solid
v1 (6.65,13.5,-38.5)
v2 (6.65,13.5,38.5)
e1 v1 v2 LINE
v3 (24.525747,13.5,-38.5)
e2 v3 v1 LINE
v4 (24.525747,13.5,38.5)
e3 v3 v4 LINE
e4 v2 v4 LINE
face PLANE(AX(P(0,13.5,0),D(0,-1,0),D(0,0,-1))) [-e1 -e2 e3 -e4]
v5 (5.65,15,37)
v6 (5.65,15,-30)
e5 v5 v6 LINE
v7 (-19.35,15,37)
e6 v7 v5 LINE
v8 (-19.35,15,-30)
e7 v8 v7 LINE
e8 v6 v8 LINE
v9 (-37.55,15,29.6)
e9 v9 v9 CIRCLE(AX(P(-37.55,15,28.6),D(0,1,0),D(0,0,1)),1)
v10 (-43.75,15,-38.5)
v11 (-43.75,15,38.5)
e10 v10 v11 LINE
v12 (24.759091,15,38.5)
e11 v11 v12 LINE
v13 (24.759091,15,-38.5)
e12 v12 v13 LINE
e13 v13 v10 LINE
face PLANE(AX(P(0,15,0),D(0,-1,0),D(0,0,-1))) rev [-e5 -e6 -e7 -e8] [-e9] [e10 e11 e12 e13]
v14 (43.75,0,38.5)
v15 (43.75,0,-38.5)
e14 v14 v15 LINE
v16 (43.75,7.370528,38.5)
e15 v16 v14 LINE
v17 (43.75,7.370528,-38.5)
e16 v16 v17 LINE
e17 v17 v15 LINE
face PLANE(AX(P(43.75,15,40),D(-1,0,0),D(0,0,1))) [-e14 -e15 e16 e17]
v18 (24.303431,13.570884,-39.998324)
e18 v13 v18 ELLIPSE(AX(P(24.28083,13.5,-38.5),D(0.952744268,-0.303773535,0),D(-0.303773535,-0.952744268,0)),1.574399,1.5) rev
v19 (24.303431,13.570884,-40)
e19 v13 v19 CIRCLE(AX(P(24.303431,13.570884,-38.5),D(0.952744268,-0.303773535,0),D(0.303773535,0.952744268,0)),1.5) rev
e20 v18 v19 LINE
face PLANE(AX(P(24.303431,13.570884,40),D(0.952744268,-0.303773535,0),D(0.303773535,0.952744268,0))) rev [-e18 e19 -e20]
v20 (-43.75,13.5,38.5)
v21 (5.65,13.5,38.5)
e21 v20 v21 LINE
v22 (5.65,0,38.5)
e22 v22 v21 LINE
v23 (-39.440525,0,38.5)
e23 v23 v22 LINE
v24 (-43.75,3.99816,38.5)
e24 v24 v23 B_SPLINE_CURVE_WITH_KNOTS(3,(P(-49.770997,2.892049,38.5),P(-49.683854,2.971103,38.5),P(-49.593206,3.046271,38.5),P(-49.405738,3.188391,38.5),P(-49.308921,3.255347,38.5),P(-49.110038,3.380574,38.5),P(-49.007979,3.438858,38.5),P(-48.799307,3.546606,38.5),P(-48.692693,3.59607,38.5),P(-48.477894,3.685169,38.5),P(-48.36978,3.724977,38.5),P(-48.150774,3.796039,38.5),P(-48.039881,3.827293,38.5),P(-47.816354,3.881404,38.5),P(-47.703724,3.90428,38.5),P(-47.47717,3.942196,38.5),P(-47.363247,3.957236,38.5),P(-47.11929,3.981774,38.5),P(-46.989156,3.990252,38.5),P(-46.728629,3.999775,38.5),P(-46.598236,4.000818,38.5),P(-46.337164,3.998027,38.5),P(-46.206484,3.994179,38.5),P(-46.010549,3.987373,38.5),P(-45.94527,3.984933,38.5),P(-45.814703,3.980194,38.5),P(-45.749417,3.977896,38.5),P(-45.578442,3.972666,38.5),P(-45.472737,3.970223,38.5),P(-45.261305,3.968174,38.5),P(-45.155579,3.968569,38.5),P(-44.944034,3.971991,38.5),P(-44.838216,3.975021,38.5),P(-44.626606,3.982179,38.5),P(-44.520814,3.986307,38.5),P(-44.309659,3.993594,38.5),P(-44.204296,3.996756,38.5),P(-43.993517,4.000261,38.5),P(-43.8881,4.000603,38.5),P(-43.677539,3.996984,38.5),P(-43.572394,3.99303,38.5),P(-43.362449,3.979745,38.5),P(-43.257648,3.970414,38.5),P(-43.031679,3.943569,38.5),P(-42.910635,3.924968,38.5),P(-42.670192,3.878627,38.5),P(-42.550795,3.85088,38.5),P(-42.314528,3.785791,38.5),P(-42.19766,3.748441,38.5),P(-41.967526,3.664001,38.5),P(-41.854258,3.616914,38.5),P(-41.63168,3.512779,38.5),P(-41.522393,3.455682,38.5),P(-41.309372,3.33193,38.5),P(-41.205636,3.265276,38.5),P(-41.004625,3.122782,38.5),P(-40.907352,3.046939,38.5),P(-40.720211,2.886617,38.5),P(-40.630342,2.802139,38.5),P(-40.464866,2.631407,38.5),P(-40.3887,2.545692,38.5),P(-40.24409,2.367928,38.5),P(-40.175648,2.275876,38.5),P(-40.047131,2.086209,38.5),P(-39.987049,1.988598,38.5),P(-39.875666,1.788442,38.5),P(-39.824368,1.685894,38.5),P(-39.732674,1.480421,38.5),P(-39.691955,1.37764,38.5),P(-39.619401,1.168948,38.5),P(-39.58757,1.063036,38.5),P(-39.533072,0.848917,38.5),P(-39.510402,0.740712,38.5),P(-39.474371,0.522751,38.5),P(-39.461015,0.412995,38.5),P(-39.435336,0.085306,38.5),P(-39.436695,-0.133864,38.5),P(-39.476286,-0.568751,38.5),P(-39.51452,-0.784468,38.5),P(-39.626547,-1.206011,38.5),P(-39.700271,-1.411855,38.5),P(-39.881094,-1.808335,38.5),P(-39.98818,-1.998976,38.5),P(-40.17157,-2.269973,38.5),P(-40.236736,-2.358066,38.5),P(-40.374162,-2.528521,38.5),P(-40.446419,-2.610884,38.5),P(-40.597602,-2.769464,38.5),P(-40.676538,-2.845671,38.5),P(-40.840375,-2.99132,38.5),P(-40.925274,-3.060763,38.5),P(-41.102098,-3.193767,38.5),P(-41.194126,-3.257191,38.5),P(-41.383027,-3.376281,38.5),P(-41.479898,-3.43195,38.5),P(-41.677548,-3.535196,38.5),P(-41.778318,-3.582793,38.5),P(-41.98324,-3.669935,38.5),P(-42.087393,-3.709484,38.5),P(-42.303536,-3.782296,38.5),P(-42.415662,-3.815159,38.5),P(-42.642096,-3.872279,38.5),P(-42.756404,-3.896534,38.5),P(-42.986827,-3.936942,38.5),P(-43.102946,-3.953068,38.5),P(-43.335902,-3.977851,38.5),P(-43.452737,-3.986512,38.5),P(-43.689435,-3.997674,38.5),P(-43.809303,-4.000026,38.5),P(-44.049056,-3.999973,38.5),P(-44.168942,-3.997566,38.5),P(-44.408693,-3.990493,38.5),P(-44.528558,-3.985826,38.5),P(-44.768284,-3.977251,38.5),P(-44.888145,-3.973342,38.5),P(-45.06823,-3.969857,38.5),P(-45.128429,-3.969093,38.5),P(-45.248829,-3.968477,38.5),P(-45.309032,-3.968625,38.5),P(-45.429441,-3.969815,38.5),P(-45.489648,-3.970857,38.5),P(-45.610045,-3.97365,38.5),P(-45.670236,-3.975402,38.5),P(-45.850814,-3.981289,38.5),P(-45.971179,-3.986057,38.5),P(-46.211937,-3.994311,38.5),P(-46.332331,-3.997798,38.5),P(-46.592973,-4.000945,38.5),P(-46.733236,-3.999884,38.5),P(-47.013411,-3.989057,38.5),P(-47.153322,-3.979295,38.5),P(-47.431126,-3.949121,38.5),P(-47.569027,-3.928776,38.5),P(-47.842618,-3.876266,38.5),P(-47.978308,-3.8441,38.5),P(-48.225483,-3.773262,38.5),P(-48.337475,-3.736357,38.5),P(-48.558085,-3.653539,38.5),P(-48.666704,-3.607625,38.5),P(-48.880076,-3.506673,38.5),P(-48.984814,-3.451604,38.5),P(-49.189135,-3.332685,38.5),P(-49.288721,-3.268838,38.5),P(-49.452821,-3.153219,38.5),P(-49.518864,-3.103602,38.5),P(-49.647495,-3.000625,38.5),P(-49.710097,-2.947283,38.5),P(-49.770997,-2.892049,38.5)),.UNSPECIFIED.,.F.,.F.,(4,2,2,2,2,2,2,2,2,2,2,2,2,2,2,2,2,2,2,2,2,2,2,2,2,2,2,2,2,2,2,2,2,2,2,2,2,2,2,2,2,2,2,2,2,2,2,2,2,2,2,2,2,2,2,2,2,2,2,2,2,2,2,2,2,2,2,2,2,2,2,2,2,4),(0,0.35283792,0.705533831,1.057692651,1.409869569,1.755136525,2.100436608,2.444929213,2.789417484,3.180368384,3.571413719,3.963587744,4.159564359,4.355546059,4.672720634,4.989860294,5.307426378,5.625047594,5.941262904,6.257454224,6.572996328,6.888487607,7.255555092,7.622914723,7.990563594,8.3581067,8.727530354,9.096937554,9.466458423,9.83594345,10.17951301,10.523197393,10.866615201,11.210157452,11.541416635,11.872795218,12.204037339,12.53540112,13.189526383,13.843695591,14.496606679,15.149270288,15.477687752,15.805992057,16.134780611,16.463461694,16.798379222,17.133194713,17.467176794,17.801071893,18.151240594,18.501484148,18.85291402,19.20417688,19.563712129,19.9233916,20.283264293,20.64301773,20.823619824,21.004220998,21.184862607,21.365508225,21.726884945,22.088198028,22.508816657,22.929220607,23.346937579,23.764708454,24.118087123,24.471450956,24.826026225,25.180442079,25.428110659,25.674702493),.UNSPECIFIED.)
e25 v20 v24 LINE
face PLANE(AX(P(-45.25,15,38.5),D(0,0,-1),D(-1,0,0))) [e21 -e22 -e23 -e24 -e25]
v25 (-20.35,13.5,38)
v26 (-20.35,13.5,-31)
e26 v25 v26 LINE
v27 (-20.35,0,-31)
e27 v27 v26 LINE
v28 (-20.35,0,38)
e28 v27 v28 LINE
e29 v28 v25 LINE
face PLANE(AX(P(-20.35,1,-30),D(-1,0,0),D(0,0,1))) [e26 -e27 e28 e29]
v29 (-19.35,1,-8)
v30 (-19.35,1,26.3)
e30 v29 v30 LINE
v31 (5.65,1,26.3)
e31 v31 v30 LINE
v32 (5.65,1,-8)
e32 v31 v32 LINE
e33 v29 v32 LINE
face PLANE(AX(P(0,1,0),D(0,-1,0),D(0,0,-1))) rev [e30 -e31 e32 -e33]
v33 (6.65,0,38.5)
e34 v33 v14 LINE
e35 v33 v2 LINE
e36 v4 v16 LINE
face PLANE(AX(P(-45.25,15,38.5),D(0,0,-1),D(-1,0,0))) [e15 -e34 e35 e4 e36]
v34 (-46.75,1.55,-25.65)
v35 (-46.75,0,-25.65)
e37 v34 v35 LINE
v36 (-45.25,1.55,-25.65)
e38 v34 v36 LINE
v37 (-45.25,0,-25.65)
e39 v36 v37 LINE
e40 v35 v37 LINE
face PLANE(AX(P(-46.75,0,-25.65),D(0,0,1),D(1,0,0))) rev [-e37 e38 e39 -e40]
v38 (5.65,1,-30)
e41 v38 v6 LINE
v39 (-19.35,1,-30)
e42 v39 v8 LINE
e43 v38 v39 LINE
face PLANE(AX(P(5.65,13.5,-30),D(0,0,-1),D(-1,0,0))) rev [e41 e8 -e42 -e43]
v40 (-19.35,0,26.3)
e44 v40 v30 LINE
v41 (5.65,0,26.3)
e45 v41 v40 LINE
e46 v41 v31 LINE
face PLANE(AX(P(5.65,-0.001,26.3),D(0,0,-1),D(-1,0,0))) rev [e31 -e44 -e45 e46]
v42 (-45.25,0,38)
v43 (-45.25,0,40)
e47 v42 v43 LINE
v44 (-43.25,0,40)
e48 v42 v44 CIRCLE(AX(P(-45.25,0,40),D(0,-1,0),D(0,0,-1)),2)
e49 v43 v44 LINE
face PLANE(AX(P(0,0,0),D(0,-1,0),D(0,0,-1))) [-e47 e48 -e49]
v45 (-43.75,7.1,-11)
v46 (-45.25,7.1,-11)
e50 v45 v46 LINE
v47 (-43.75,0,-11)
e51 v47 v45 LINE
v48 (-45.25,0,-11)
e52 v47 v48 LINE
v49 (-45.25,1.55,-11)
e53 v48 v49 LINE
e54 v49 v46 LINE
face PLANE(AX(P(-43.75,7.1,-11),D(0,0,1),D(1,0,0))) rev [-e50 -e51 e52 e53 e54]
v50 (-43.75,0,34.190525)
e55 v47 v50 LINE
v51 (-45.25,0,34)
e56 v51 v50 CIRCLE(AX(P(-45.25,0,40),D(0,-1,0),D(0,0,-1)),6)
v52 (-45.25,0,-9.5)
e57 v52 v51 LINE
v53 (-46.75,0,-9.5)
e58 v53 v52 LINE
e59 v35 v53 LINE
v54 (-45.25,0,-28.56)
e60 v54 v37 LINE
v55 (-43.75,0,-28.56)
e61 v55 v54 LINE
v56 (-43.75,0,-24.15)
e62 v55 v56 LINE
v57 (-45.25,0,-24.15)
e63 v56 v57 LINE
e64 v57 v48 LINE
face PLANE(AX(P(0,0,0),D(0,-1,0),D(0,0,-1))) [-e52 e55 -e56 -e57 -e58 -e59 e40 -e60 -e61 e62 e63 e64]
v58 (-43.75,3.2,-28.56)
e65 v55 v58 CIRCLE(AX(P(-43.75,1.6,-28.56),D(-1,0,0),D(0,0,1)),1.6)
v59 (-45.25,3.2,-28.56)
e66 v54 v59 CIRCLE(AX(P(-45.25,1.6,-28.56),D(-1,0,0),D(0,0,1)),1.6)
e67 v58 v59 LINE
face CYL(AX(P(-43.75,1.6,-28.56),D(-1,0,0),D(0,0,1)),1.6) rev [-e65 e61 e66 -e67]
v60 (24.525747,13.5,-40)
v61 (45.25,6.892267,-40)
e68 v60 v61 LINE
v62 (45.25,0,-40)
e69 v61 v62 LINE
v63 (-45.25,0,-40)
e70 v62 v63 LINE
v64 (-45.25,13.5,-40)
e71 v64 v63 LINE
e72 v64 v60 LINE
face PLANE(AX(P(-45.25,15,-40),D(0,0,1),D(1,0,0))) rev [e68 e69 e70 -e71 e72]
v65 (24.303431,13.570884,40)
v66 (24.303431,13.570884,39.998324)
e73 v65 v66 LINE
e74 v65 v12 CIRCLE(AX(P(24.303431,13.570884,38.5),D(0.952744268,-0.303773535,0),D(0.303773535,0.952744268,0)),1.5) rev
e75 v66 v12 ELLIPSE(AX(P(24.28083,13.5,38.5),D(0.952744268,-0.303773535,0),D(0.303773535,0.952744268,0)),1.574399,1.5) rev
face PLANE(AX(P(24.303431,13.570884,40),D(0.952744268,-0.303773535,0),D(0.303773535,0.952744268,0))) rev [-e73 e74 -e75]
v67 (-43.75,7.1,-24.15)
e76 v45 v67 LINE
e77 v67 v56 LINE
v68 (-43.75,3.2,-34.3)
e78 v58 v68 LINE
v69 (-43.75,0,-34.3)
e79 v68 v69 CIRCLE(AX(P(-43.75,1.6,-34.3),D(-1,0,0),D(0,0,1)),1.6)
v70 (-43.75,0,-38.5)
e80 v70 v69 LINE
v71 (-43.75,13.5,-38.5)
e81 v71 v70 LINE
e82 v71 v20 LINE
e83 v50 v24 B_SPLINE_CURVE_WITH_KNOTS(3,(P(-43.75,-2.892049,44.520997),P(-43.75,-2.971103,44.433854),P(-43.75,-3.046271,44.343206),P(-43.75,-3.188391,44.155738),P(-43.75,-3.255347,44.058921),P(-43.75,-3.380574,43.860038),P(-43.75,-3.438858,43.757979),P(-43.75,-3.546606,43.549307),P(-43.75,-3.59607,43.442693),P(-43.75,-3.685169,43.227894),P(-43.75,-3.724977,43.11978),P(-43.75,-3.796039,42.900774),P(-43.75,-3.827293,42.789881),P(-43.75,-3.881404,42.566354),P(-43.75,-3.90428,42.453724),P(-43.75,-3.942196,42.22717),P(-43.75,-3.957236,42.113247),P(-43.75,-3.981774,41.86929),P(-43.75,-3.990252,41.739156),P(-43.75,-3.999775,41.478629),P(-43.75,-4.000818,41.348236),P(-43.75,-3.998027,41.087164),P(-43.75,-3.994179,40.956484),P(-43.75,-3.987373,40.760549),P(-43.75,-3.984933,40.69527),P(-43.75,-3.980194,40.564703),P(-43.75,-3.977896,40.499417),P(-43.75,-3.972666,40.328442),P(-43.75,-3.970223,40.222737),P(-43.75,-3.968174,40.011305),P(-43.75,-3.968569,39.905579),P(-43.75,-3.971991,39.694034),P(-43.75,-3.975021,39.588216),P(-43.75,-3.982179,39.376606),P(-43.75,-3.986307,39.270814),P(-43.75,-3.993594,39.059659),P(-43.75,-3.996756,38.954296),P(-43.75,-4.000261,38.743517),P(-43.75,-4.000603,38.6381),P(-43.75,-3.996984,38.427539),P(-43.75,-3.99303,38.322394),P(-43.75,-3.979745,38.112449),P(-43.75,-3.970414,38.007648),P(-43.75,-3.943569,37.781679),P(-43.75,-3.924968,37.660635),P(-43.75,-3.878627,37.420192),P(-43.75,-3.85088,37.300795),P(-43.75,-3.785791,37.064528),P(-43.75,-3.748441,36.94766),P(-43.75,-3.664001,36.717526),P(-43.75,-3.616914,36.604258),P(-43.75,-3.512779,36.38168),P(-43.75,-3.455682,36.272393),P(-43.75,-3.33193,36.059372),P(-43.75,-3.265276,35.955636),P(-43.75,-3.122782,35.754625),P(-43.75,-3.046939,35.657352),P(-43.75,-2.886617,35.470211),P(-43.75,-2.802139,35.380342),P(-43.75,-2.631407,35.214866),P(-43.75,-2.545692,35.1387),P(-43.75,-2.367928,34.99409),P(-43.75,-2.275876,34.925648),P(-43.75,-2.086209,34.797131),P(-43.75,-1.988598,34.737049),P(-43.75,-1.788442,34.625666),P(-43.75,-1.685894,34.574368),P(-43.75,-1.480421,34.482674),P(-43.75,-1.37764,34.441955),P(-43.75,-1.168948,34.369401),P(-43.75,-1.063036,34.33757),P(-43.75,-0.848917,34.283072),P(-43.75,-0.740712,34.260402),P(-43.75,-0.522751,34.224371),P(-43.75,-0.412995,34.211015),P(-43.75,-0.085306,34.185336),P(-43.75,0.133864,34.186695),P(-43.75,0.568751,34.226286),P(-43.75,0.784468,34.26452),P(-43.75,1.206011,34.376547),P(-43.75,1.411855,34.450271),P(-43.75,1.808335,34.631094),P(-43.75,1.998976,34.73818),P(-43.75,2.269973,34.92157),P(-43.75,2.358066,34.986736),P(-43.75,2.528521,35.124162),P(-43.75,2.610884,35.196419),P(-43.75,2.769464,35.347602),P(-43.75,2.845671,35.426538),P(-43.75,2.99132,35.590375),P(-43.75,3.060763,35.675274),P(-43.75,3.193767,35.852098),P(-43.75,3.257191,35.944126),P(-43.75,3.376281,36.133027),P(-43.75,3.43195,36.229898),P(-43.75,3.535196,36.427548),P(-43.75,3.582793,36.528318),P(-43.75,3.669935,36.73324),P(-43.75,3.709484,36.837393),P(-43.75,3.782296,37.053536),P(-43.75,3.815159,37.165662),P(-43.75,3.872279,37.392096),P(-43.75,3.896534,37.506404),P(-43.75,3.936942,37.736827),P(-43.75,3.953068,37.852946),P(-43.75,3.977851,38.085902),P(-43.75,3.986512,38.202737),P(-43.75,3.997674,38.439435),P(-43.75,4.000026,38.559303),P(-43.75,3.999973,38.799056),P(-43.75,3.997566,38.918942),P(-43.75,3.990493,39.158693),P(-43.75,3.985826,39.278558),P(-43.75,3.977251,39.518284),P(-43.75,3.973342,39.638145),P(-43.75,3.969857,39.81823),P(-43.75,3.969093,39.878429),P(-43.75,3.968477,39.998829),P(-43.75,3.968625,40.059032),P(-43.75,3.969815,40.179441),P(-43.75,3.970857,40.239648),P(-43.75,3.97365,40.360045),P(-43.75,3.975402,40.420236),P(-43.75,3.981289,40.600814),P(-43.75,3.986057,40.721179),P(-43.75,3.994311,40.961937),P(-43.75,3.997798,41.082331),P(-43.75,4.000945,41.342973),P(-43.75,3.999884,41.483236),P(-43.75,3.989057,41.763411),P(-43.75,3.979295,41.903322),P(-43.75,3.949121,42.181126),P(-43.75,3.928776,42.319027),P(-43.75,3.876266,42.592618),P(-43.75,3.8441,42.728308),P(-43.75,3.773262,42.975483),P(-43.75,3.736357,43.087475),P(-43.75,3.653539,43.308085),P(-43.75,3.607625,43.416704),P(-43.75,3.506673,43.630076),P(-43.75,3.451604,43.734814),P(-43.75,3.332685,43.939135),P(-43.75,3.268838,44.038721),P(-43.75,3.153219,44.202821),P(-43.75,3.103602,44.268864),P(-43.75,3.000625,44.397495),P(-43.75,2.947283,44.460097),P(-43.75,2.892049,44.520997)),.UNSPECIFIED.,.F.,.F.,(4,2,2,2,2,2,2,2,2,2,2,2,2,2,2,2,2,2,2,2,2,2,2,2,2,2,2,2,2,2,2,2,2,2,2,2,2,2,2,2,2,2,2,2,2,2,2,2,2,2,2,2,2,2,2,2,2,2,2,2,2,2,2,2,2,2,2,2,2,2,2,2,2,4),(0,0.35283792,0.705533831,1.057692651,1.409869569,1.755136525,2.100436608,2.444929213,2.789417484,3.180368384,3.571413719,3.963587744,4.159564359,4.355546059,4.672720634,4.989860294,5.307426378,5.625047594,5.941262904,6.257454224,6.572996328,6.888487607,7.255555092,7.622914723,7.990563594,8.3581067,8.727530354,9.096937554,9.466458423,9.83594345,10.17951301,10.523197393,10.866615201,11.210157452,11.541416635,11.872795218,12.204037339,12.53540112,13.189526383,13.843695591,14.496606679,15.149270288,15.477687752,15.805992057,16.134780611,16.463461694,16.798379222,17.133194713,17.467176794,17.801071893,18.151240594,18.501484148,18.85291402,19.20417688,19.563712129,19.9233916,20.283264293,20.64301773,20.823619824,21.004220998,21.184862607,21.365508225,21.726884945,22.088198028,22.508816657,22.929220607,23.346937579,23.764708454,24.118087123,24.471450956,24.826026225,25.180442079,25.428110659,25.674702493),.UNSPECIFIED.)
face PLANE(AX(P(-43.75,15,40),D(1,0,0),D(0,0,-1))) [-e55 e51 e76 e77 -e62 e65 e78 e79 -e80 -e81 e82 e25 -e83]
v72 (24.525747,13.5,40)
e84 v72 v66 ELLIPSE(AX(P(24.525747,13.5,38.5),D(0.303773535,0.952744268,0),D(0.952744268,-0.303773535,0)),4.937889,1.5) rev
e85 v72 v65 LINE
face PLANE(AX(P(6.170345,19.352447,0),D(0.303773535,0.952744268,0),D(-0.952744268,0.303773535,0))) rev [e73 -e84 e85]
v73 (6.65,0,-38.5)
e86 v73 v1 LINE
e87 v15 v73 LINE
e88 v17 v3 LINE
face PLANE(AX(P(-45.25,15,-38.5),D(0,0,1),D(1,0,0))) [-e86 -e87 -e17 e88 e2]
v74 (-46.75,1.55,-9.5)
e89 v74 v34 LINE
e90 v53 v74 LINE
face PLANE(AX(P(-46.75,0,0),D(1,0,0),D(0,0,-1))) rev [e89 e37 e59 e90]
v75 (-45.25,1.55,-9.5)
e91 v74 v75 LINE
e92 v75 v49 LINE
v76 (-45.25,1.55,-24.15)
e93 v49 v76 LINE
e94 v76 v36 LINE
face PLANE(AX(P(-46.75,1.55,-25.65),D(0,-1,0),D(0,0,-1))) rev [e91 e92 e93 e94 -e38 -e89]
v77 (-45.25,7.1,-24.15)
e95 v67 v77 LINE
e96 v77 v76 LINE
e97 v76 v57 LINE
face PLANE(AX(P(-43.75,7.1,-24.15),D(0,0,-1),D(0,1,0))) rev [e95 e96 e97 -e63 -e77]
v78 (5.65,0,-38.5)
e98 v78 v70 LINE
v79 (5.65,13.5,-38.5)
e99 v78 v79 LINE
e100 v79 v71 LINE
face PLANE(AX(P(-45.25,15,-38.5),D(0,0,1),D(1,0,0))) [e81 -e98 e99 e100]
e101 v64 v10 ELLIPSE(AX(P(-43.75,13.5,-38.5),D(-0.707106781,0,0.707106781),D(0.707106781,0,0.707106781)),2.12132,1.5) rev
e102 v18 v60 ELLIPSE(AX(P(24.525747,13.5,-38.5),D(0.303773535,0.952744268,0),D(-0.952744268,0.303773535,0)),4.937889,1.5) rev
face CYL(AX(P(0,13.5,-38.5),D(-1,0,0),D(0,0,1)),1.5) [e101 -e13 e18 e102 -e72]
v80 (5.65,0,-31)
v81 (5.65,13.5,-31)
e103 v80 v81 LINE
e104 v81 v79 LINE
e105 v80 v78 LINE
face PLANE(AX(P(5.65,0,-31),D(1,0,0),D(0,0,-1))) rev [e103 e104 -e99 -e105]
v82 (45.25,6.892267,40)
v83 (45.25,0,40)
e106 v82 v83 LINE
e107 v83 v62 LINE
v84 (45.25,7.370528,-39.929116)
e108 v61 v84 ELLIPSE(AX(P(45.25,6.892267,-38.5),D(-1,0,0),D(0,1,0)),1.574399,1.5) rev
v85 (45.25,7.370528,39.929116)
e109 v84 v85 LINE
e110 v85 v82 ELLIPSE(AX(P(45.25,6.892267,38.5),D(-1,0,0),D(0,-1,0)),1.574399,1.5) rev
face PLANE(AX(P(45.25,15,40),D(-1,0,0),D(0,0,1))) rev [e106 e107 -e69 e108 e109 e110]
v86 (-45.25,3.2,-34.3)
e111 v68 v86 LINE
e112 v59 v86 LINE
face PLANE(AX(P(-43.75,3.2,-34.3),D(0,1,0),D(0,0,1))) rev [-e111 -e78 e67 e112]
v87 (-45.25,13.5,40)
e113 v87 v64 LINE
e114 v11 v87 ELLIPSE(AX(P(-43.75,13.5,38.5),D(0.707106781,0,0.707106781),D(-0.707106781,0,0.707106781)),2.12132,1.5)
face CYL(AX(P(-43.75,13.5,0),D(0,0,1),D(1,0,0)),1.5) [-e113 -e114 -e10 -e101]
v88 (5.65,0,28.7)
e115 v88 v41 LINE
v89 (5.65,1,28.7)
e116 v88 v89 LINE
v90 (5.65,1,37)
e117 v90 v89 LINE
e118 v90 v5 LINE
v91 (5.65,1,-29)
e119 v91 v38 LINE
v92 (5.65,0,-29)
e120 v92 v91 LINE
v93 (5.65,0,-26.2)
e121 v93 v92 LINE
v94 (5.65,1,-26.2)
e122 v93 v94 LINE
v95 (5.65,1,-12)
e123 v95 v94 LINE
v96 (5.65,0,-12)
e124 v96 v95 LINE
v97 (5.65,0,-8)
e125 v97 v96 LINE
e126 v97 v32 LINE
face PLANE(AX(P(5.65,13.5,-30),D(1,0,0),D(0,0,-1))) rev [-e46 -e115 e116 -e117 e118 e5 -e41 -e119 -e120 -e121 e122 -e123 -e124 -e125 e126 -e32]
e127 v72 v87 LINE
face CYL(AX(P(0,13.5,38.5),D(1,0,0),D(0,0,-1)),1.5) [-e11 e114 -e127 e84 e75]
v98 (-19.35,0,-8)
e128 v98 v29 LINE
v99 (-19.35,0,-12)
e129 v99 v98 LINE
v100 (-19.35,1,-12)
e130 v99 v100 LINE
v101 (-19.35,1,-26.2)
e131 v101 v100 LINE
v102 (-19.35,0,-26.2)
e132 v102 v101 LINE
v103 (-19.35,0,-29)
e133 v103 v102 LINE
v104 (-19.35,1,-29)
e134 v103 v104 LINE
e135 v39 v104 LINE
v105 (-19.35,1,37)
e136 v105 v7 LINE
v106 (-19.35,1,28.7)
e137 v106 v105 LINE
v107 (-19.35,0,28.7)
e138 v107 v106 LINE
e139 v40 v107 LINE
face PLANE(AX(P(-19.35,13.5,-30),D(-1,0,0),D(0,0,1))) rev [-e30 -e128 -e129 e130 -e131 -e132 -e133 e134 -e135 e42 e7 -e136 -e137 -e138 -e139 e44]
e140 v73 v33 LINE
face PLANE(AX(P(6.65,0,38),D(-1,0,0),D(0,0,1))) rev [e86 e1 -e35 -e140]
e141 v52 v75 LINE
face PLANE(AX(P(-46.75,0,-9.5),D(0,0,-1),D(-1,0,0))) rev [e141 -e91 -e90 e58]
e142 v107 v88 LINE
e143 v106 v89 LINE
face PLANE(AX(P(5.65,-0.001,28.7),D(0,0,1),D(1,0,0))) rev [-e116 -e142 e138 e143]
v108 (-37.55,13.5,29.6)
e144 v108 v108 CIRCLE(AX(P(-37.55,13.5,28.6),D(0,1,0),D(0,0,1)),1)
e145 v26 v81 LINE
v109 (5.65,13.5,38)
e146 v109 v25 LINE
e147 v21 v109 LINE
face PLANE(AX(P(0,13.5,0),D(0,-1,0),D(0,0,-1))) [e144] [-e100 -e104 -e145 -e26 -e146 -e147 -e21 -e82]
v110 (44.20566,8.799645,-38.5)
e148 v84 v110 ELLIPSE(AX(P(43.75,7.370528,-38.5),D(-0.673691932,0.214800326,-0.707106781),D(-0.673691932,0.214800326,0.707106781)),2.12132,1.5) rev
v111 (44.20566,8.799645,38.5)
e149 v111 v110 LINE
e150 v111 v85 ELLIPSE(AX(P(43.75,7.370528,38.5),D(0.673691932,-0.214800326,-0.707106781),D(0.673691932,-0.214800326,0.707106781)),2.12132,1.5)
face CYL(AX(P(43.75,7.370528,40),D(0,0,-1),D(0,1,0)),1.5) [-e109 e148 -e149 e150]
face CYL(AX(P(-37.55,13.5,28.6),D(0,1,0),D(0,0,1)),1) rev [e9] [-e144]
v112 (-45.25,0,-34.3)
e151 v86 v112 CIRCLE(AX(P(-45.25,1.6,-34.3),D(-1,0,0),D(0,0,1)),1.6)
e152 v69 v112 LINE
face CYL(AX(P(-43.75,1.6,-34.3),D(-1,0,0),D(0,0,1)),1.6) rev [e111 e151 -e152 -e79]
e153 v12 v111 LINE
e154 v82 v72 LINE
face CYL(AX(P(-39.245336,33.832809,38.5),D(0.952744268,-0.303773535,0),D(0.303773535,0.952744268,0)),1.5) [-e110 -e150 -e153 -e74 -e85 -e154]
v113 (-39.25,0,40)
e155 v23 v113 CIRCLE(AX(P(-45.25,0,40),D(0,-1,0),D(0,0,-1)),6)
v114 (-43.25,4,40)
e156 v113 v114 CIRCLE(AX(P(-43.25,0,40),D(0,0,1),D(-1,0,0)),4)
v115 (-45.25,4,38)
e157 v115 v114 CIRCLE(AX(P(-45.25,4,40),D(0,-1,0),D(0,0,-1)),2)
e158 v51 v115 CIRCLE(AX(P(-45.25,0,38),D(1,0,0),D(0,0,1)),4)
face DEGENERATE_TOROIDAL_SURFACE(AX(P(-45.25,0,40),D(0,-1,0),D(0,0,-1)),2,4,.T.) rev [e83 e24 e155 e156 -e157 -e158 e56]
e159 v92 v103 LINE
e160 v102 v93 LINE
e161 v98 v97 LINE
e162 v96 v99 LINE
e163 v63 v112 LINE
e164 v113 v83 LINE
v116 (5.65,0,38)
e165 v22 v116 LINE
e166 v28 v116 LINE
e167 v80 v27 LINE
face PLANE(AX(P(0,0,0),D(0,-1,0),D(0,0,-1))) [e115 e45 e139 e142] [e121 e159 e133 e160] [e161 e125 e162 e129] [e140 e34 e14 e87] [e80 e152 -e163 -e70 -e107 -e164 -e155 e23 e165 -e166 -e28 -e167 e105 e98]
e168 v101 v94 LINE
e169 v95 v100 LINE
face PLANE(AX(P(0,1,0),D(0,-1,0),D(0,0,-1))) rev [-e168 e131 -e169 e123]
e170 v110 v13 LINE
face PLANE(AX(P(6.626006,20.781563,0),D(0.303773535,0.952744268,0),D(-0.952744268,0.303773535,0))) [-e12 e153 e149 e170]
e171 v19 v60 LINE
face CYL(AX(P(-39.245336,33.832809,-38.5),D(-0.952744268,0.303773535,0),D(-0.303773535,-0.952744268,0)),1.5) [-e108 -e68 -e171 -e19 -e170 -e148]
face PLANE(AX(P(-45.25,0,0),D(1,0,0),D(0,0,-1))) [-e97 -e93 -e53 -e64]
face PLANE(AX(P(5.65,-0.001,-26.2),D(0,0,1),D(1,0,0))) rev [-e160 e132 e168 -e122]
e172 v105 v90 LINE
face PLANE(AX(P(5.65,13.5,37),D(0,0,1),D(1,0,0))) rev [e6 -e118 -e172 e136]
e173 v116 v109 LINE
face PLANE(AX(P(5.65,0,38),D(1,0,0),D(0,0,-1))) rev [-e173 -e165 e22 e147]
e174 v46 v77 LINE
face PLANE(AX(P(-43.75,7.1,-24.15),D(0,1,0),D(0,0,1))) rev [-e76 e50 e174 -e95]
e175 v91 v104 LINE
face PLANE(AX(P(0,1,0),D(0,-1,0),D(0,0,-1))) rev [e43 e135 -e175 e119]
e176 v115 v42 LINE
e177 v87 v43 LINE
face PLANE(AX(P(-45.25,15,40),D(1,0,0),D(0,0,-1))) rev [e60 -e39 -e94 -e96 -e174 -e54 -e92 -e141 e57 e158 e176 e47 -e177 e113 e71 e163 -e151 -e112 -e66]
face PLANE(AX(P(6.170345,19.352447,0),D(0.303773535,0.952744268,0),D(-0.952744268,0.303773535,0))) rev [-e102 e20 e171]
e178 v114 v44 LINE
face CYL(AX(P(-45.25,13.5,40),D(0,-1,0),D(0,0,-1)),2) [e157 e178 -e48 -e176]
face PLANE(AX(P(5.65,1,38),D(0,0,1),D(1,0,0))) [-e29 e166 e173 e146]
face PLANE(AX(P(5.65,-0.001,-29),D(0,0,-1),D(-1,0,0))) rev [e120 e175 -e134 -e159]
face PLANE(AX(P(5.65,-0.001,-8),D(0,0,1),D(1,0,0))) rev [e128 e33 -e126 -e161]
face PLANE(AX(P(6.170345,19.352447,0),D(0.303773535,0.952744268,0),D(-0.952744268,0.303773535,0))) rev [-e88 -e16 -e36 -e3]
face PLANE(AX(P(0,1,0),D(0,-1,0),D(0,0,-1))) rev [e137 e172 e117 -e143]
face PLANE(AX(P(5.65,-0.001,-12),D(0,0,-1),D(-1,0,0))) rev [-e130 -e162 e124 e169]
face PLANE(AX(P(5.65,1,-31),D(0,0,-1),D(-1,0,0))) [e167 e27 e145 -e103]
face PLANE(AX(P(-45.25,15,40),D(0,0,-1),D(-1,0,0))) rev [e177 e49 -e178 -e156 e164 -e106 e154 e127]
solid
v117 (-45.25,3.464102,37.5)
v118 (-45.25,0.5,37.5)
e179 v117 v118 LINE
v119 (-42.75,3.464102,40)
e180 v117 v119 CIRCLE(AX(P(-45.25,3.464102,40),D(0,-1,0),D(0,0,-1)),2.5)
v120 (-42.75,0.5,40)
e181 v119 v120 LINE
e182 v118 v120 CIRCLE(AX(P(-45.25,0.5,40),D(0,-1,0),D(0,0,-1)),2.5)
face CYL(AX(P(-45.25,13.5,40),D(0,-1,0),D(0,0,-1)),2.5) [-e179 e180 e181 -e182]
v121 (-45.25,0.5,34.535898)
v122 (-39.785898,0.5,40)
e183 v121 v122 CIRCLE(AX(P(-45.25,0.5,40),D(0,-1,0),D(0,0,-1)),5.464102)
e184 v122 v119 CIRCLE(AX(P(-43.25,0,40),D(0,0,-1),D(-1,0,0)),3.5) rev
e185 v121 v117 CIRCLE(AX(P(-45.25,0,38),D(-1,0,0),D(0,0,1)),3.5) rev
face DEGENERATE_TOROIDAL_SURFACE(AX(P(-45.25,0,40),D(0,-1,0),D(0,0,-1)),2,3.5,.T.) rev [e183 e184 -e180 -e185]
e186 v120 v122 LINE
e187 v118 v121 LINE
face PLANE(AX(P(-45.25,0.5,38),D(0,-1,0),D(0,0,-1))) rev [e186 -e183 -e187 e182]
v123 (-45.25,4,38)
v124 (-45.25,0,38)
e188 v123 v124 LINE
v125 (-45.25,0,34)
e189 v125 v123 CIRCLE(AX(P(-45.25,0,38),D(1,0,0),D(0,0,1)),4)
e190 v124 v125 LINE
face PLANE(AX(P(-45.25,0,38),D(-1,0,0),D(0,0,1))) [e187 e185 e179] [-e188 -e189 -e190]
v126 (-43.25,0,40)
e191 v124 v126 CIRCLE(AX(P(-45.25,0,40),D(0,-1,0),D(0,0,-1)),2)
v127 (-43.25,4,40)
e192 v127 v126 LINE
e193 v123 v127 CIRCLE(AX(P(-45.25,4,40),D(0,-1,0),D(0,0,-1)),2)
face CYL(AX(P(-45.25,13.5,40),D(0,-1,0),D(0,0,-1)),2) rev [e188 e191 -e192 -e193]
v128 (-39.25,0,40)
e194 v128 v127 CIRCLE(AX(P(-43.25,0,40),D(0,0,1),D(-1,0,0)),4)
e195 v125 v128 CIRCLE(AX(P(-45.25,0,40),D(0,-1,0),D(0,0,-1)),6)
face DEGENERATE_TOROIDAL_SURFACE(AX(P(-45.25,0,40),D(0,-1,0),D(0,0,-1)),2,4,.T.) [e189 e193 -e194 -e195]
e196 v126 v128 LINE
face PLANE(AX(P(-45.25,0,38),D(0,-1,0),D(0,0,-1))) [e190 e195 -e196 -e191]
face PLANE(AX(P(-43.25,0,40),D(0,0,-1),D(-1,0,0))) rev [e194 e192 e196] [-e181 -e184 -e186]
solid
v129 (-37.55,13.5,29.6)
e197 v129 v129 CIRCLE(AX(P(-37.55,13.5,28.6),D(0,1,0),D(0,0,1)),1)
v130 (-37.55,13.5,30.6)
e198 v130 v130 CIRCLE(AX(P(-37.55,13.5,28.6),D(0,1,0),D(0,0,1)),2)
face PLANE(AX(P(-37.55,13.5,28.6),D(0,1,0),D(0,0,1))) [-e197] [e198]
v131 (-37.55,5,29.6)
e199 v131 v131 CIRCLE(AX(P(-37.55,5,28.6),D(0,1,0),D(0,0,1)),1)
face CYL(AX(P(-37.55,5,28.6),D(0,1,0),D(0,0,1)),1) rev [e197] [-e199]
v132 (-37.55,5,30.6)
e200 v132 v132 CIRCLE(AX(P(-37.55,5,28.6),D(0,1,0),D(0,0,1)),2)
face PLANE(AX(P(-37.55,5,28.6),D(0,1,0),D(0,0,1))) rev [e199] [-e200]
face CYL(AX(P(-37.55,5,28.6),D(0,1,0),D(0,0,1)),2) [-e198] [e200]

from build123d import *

# Parameters (mm, degrees)
SKETCH1_W            = 90.5
SKETCH1_H            = 80
BOSS_EXTRUDE1_DEPTH  = 15
SHELL3_T             = -1.5
CUT_EXTRUDE2_DEPTH   = 1.5
SKETCH6_W            = 13.15
SKETCH6_H            = 7.1
CUT_EXTRUDE3_DEPTH   = 1.5
SKETCH9_W            = 16.15
SKETCH9_H            = 1.55
BOSS_EXTRUDE2_DEPTH  = 1.5
FILLET7_R            = 1.5
SKETCH20_W           = 25
SKETCH20_H           = 67
BOSS_EXTRUDE8_DEPTH  = 14
SKETCH20_2_W         = 25
SKETCH20_2_H         = 67
CUT_EXTRUDE9_DEPTH   = 1.5
SHELL6_T             = 1
SKETCH21_W           = 1
SKETCH21_H           = 0.5
SKETCH21_H_2         = 7.5
BOSS_EXTRUDE9_DEPTH  = 13.5
SKETCH11_R           = 1
BOSS_EXTRUDE10_DEPTH = 10
SKETCH11_3_R         = 1
CUT_EXTRUDE10_DEPTH  = 1.5
SHELL9_T             = 1
CUT_REVOLVE4_ANGLE   = 90
REVOLVE3_ANGLE       = 90
SHELL14_T            = -0.5
SKETCH41_W           = 25
SKETCH41_H           = 2.8
SKETCH41_H_2         = 4
SKETCH41_H_3         = 2.4
CUT_EXTRUDE11_DEPTH  = 1
SKETCH45_W           = 21.507249936
SKETCH45_H           = 80
CUT_EXTRUDE13_DEPTH  = 10
SKETCH45_2_W         = 21.507249936
SKETCH45_2_H         = 80
BOSS_EXTRUDE11_DEPTH = 1.5
FILLET11_R           = 1.5


with BuildPart() as part:
    # Sketch1 → Boss-Extrude1 (new body)
    with BuildSketch(Plane(origin=(0, 0, 0), x_dir=(1, 0, 0), z_dir=(0, 1, 0))):
        Rectangle(SKETCH1_W, SKETCH1_H)
    extrude(amount=BOSS_EXTRUDE1_DEPTH)

    # Shell3
    shell3_openings = [part.faces().sort_by_distance(p)[0] for p in [
        (0, 0, 0),
    ]]
    offset(amount=SHELL3_T, openings=shell3_openings, kind=Kind.INTERSECTION)

    # Sketch4 → Cut-Extrude2 (cut)
    with BuildSketch(Plane.ZY.offset(45.25)):
        with BuildLine():
            Line((-34.3, 3.2), (-28.56, 3.2))
            ThreePointArc((-28.56, 3.2), (-26.96, 1.6), (-28.56, 0))
            Line((-28.56, 0), (-34.3, 0))
            ThreePointArc((-34.3, 0), (-35.9, 1.6), (-34.3, 3.2))
        make_face()
    extrude(amount=-CUT_EXTRUDE2_DEPTH, mode=Mode.SUBTRACT)

    # Sketch6 → Cut-Extrude3 (cut)
    with BuildSketch(Plane.ZY.offset(45.25)):
        with Locations((-17.575, 3.55)):
            Rectangle(SKETCH6_W, SKETCH6_H)
    extrude(amount=-CUT_EXTRUDE3_DEPTH, mode=Mode.SUBTRACT)

    # Sketch9 → Boss-Extrude2 (add)
    with BuildSketch(Plane.ZY.offset(45.25)):
        with Locations((-17.575, 0.775)):
            Rectangle(SKETCH9_W, SKETCH9_H)
    extrude(amount=BOSS_EXTRUDE2_DEPTH)

    # Fillet7
    fillet7_edges = [part.edges().sort_by_distance(p)[0] for p in [
        (-45.25, 15, 0),
        (0, 15, 40),
        (45.25, 15, 0),
        (0, 15, -40),
    ]]
    fillet(fillet7_edges, radius=FILLET7_R)

    # Sketch20 → Boss-Extrude8 (add)
    with BuildSketch(Plane(origin=(0, 15, 0), x_dir=(1, 0, 0), z_dir=(0, 1, 0))):
        with Locations((-6.85, -3.5)):
            Rectangle(SKETCH20_W, SKETCH20_H)
    extrude(amount=-BOSS_EXTRUDE8_DEPTH)

    # Sketch20<2> → Cut-Extrude9 (cut)
    with BuildSketch(Plane(origin=(0, 15, 0), x_dir=(1, 0, 0), z_dir=(0, 1, 0))):
        with Locations((-6.85, -3.5)):
            Rectangle(SKETCH20_2_W, SKETCH20_2_H)
    extrude(amount=-CUT_EXTRUDE9_DEPTH, mode=Mode.SUBTRACT)


with BuildPart() as cut_extrude9_piece_1:
    # of the separate pieces the step leaves, piece 1, a body of its own (cut_extrude9_pieces)
    add(part.part.solids().sort_by_distance((-19.35, 1, -30))[0])

    # Shell6
    shell6_openings = [cut_extrude9_piece_1.faces().sort_by_distance(p)[0] for p in [
        (-6.85, 13.5, 3.5),
    ]]
    offset(amount=SHELL6_T, openings=shell6_openings, kind=Kind.INTERSECTION)



with BuildPart() as cut_extrude9_piece_2:
    # of the separate pieces the step leaves, piece 2, a body of its own (cut_extrude9_pieces)
    add(part.part.solids().sort_by_distance((-45.25, 13.5, 40))[0])


with BuildPart() as cut_extrude9_piece_1_1:
    add(cut_extrude9_piece_1.part)

    add(cut_extrude9_piece_2.part)  # Boss-Extrude9 merges Cut-Extrude9 piece 2
    # Sketch21 → Boss-Extrude9 (add)
    with BuildSketch(Plane(origin=(0, 13.5, 0), x_dir=(-1, 0, 0), z_dir=(0, -1, 0))):
        with Locations((-6.15, -38.25)):
            Rectangle(SKETCH21_W, SKETCH21_H)
        with Locations((-6.15, 34.75)):
            Rectangle(SKETCH21_W, SKETCH21_H_2)
    extrude(amount=BOSS_EXTRUDE9_DEPTH)

    # Sketch11 → Boss-Extrude10 (add)
    with BuildSketch(Plane(origin=(0, 15, 0), x_dir=(1, 0, 0), z_dir=(0, 1, 0))):
        with Locations(Location((-37.55, -28.6, 0), (0, 0, 270))):
            Circle(SKETCH11_R)
    extrude(amount=-BOSS_EXTRUDE10_DEPTH)

    # Sketch11<3> → Cut-Extrude10 (cut)
    with BuildSketch(Plane(origin=(0, 15, 0), x_dir=(1, 0, 0), z_dir=(0, 1, 0))):
        with Locations(Location((-37.55, -28.6, 0), (0, 0, 270))):
            Circle(SKETCH11_3_R)
    extrude(amount=-CUT_EXTRUDE10_DEPTH, mode=Mode.SUBTRACT)


with BuildPart() as cut_extrude10_piece_1:
    # of the separate pieces the step leaves, piece 1, a body of its own (cut_extrude10_pieces)
    add(cut_extrude9_piece_1_1.part.solids().sort_by_distance((-45.25, 13.5, 40))[0])

    # Sketch33 → Cut-Revolve4 (revolve, cut)
    with BuildSketch(Plane.XY.offset(40)):
        with BuildLine():
            Line((-43.25, 4), (-43.25, 0))
            Line((-43.25, 0), (-39.25, 0))
            ThreePointArc((-39.25, 0), (-40.421572875, 2.828427125), (-43.25, 4))
        make_face()
    revolve(axis=Axis((-45.25, 15, 40), (0, 1, 0)), revolution_arc=CUT_REVOLVE4_ANGLE, mode=Mode.SUBTRACT)

    # Sketch41 → Cut-Extrude11 (cut)
    with BuildSketch(Plane(origin=(0, 1, 0), x_dir=(1, 0, 0), z_dir=(0, 1, 0))):
        with Locations((-6.85, 27.6)):
            Rectangle(SKETCH41_W, SKETCH41_H)
        with Locations((-6.85, 10)):
            Rectangle(SKETCH41_W, SKETCH41_H_2)
        with Locations((-6.85, -27.5)):
            Rectangle(SKETCH41_W, SKETCH41_H_3)
    extrude(amount=-CUT_EXTRUDE11_DEPTH, mode=Mode.SUBTRACT)

    # Sketch45 → Cut-Extrude13 (cut)
    with BuildSketch(Plane(origin=(6.62600572, 20.781563394, 0), x_dir=(-0.9527442677113392, 0.3037735346326008, 0), z_dir=(-0.3037735346326008, -0.9527442677113392, 0))):
        with Locations((-29.786103886, 0)):
            Rectangle(SKETCH45_W, SKETCH45_H)
    extrude(amount=-CUT_EXTRUDE13_DEPTH, mode=Mode.SUBTRACT)

    # Sketch45<2> → Boss-Extrude11 (add)
    with BuildSketch(Plane(origin=(6.62600572, 20.781563394, 0), x_dir=(-0.9527442677113392, 0.3037735346326008, 0), z_dir=(-0.3037735346326008, -0.9527442677113392, 0))):
        with Locations((-29.786103886, 0)):
            Rectangle(SKETCH45_2_W, SKETCH45_2_H)
    extrude(amount=BOSS_EXTRUDE11_DEPTH)

    # Fillet11
    fillet11_edges = [cut_extrude10_piece_1.edges().sort_by_distance(p)[0] for p in [
        (45.25, 8.466666667, 0),
        (35.004545455, 11.733333333, 40),
        (35.004545455, 11.733333333, -40),
    ]]
    fillet(fillet11_edges, radius=FILLET11_R - 0.0001)  # a hair under: the kernel refuses the full size


with BuildPart() as cut_extrude10_piece_2:
    # of the separate pieces the step leaves, piece 2, a body of its own (cut_extrude10_pieces)
    add(cut_extrude9_piece_1_1.part.solids().sort_by_distance((-37.55, 5, 29.6))[0])

    # Shell9
    shell9_openings = [cut_extrude10_piece_2.faces().sort_by_distance(p)[0] for p in [
        (-37.55, 5, 28.6),
        (-37.55, 13.5, 28.6),
    ]]
    offset(amount=SHELL9_T, openings=shell9_openings, kind=Kind.INTERSECTION)


with BuildPart() as body_3:
    # Sketch33<2> → Revolve3 (revolve)
    with BuildSketch(Plane.XY.offset(40)):
        with BuildLine():
            Line((-43.25, 4), (-43.25, 0))
            Line((-43.25, 0), (-39.25, 0))
            ThreePointArc((-39.25, 0), (-40.421572875, 2.828427125), (-43.25, 4))
        make_face()
    revolve(axis=Axis((-45.25, 15, 40), (0, 1, 0)), revolution_arc=REVOLVE3_ANGLE)

    # Shell14
    shell14_openings = [body_3.faces().sort_by_distance(p)[0] for p in [
        (-45.25, 1.697652726, 36.302347274),
        (-41.552347274, 1.697652726, 40),
    ]]
    offset(amount=SHELL14_T, openings=shell14_openings)


solid = Compound([cut_extrude10_piece_1.part, cut_extrude10_piece_2.part, body_3.part])
